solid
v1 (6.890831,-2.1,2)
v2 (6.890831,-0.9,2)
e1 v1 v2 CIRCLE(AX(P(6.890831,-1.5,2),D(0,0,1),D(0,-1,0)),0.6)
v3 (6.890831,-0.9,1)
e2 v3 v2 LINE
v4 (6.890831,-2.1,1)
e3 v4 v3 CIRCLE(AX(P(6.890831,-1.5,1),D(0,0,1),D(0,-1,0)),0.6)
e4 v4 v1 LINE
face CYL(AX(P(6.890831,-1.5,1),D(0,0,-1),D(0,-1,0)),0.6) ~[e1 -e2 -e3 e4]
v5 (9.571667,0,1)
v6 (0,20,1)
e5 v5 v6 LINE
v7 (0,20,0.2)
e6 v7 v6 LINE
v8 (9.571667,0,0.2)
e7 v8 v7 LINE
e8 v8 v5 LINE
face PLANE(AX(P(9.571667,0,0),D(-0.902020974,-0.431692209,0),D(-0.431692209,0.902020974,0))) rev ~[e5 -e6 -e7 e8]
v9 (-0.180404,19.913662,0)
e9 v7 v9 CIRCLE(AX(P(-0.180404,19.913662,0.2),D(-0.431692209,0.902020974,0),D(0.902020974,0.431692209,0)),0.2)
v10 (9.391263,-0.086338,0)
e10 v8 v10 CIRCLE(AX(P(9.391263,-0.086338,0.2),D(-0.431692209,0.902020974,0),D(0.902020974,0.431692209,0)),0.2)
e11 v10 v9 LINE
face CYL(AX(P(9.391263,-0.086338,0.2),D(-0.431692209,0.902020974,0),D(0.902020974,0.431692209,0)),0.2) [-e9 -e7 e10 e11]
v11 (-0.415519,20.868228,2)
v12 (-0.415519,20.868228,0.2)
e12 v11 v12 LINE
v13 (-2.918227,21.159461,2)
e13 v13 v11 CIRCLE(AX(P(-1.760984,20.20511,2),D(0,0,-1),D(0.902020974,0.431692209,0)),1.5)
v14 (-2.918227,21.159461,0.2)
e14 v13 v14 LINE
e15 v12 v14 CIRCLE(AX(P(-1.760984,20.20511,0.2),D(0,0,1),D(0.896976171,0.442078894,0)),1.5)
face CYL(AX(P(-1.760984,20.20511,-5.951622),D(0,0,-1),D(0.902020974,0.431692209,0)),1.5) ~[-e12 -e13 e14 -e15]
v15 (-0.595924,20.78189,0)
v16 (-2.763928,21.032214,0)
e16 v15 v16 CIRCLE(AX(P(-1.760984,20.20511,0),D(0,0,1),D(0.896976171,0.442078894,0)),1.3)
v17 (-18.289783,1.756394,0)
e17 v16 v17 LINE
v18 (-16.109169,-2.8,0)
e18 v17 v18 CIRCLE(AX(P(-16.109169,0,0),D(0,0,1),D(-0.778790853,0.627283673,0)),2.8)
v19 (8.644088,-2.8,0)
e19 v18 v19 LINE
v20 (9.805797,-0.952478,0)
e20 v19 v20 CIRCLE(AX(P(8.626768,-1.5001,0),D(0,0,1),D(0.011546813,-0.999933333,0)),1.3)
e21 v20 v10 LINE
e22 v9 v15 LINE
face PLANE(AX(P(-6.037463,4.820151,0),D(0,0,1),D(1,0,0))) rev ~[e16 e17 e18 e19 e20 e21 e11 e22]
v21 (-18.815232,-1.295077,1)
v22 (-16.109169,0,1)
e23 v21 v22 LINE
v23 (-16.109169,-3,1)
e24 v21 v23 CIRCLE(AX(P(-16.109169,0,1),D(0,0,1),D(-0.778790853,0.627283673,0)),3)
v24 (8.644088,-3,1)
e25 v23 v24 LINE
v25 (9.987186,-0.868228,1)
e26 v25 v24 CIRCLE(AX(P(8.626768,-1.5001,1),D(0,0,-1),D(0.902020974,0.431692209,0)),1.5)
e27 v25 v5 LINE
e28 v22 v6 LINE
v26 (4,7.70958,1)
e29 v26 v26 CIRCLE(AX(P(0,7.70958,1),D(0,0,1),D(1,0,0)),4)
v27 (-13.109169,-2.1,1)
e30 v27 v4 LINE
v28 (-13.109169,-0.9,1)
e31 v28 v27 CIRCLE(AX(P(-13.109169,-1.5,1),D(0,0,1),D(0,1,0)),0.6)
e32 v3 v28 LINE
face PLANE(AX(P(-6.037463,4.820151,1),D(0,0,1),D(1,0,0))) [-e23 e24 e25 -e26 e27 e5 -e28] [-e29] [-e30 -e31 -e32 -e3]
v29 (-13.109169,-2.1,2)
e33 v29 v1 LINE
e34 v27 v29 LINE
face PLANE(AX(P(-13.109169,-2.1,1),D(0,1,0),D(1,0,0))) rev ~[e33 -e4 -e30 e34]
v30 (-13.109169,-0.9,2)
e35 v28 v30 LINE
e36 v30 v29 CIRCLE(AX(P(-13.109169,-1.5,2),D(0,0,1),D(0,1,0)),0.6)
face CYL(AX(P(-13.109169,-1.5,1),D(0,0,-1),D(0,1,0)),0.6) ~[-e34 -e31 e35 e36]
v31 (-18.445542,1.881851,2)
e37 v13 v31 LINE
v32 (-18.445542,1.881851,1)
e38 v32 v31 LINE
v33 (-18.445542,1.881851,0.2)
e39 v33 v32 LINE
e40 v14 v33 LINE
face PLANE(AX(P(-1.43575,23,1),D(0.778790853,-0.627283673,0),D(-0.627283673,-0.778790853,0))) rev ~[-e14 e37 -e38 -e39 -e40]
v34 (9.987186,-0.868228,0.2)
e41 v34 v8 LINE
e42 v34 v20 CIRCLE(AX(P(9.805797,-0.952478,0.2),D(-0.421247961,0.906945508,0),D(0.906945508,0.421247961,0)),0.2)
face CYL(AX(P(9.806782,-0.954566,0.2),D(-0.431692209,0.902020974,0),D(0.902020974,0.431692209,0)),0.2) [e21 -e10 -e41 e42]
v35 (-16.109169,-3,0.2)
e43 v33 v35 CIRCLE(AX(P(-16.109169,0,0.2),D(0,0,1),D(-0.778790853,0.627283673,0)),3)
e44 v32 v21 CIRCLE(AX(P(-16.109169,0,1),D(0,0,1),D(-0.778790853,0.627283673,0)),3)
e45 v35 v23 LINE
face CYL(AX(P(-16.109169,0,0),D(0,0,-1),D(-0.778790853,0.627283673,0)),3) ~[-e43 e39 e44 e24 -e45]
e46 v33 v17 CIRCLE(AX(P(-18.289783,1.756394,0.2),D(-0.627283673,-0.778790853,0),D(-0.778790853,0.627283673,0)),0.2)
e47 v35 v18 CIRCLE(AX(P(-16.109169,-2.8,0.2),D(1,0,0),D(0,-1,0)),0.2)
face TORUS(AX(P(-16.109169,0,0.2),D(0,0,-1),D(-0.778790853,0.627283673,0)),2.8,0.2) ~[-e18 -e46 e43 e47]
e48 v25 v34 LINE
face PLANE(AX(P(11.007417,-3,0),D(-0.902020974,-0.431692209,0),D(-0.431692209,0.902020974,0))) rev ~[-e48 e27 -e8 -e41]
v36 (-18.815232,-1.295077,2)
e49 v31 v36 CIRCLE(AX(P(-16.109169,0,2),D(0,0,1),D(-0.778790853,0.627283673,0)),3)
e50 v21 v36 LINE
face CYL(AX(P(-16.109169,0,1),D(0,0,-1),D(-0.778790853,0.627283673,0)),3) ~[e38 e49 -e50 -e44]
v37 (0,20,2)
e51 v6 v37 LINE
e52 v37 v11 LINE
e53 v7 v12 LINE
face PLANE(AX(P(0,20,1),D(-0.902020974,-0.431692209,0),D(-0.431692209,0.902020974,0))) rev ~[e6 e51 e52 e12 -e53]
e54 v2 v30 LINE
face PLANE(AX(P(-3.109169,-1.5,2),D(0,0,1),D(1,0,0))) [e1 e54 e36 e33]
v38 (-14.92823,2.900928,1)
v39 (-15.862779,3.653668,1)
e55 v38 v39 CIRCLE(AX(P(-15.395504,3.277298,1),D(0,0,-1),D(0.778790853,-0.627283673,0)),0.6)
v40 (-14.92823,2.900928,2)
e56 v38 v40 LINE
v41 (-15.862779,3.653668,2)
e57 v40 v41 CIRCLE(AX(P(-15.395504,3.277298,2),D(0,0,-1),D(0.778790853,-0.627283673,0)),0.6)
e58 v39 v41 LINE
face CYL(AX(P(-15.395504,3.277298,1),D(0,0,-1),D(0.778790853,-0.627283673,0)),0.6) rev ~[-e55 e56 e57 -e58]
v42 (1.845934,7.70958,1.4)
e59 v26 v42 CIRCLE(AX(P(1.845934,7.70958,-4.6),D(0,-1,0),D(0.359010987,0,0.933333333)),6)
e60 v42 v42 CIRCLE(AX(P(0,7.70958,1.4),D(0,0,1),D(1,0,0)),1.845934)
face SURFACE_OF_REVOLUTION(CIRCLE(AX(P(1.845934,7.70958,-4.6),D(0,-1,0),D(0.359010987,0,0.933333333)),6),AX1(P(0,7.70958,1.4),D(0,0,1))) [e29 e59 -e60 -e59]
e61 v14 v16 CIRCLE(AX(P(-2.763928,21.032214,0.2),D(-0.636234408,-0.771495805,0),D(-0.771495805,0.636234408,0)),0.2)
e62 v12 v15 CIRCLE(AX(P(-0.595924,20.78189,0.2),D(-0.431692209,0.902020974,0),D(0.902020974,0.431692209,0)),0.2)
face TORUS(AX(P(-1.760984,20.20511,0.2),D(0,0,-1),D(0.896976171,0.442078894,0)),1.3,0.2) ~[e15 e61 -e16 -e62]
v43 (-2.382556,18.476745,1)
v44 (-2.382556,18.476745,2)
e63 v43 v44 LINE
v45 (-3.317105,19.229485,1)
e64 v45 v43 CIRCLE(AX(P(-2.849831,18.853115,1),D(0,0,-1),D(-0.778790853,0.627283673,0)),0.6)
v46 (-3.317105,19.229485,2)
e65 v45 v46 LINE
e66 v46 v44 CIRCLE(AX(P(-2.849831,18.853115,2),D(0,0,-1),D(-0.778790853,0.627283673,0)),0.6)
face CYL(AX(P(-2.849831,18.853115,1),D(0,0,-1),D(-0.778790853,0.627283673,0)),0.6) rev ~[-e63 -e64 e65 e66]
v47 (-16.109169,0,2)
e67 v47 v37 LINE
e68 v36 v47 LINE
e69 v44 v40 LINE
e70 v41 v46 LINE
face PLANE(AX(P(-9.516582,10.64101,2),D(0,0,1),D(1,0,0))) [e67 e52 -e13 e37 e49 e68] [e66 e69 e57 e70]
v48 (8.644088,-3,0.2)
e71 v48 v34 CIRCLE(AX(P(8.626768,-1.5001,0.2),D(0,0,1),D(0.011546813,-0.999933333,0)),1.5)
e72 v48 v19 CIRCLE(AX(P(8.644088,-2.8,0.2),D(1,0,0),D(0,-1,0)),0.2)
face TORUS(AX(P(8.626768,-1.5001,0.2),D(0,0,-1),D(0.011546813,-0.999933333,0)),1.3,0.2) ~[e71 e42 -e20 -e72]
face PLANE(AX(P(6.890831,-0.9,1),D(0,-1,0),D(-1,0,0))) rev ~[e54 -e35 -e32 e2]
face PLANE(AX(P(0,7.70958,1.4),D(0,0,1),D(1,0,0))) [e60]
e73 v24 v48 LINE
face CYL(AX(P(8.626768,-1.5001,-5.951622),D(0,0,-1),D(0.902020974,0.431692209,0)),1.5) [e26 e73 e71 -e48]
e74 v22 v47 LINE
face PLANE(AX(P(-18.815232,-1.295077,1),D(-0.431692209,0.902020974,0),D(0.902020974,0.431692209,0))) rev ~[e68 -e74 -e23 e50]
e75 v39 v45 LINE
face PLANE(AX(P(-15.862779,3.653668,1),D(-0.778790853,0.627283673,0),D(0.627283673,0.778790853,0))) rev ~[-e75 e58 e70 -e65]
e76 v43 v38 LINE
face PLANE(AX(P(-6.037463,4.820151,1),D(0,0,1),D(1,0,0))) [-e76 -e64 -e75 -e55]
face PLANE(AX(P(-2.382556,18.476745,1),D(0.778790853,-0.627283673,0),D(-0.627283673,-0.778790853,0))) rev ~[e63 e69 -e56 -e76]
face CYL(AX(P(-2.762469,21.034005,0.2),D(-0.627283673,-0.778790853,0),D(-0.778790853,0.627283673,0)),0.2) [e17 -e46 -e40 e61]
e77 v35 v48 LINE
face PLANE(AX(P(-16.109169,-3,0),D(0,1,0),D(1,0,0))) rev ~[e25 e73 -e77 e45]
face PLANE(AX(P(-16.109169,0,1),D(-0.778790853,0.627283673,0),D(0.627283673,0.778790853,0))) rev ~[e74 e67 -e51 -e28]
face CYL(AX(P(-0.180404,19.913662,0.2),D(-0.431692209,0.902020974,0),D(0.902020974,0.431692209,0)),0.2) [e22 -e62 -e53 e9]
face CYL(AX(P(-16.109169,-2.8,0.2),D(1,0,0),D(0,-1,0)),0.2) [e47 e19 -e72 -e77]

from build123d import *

# Parameters (mm, degrees)
F2_DEPTH    = 1
F4_DEPTH    = 1
F5_T1_DEPTH = 13.9032439889
F5_T3_DEPTH = 12.9032439889
F6_R        = 4
F7_DEPTH    = 0.4
F10_R       = 0.2


# Not quite as in the source:
# - a fillet or chamfer that OpenCascade refuses, or shapes differently, is made with other operations: its cross-section is extruded or revolved along the edge and cut away or added


with BuildPart() as f2:
    # F0 (on Top) → F2 (new body)
    with BuildSketch(Plane.XY):
        Polygon((0, 20), (-16.1091689951, 0), (9.5716667723, 0), align=None)
    extrude(amount=F2_DEPTH)



with BuildPart() as f2b:
    # F1 (on face) → F2, piece 2 (new body)
    with BuildSketch(Plane.XY):
        with BuildLine():
            Line((-1.4357500158, 23), (-18.4455415549, 1.8818510201))
            ThreePointArc((-18.4455415549, 1.8818510201), (-18.8152319157, -1.295076627), (-16.1091689951, -3))
            Line((-16.1091689951, -3), (11.0074167882, -3))
            Line((11.0074167882, -3), (9.5716667723, 0))
            Line((9.5716667723, 0), (-16.1091689951, 0))
            Line((-16.1091689951, 0), (0, 20))
            Line((0, 20), (-1.4357500158, 23))
        make_face()
    extrude(amount=F2_DEPTH)


with BuildPart() as f2_1:
    add(f2.part)

    add(f2b.part)  # F4 merges F2b
    # F3 (on face) → F4 (join)
    with BuildSketch(Plane.XY.offset(1)):
        with BuildLine():
            Line((-18.8152319157, -1.295076627), (-16.1091689951, 0))
            Line((-16.1091689951, 0), (0, 20))
            Line((0, 20), (-1.4357500158, 23))
            Line((-1.4357500158, 23), (-18.4455415549, 1.8818510201))
            ThreePointArc((-18.4455415549, 1.8818510201), (-19.0890609751, 0.3467618604), (-18.8152319157, -1.295076627))
        make_face()
        with BuildLine():
            ThreePointArc((-14.928229743, 2.9009278658), (-15.771874459, 2.8100235579), (-15.8627787669, 3.6536682739))
            Line((-15.8627787669, 3.6536682739), (-3.3171052997, 19.2294853393))
            ThreePointArc((-3.3171052997, 19.2294853393), (-2.4734605837, 19.3203896472), (-2.3825562758, 18.4767449312))
            Line((-2.3825562758, 18.4767449312), (-14.928229743, 2.9009278658))
        make_face(mode=Mode.SUBTRACT)
        with BuildLine():
            Line((6.8908310049, -0.9), (-13.1091689951, -0.9))
            ThreePointArc((-13.1091689951, -0.9), (-13.7091689951, -1.5), (-13.1091689951, -2.1))
            Line((-13.1091689951, -2.1), (6.8908310049, -2.1))
            ThreePointArc((6.8908310049, -2.1), (7.4908310049, -1.5), (6.8908310049, -0.9))
        make_face()
    extrude(amount=F4_DEPTH)

    # F5: fillet of radius 1.5 on 2 edges, made by hand

    # F5_s2 → F5_t1 (cut)
    with BuildSketch(Plane.XY.offset(-5.9516219944)):
        with BuildLine():
            ThreePointArc((-0.4079522763, 20.8526480249), (-1.5876028064, 21.6950557014), (-2.9291700165, 21.1460352214))
            Line((-2.9291700165, 21.1460352214), (-2.9525337421, 21.1648537316))
            ThreePointArc((-2.9525337421, 21.1648537316), (-2.2057848022, 22.0918047567), (-1.4591137414, 23.0188185102))
            Line((-1.4591137414, 23.0188185102), (-1.4086893866, 23.0129507663))
            ThreePointArc((-1.4086893866, 23.0129507663), (-0.8948356179, 21.9392531941), (-0.3808916471, 20.8655987912))
            Line((-0.3808916471, 20.8655987912), (-0.4079522763, 20.8526480249))
        make_face()
    extrude(amount=F5_T1_DEPTH, mode=Mode.SUBTRACT)

    # F5_s4 → F5_t3 (cut)
    with BuildSketch(Plane.XY.offset(-5.9516219944)):
        with BuildLine():
            ThreePointArc((9.9797994528, -0.8525616865), (9.8958833281, -2.2996913111), (8.6267679925, -3.0001))
            Line((8.6267679925, -3.0001), (8.6267679925, -3.0301))
            ThreePointArc((8.6267679925, -3.0301), (9.8170923903, -3.03), (11.0074167882, -3.03))
            Line((11.0074167882, -3.03), (11.0344774174, -2.9870492337))
            ThreePointArc((11.0344774174, -2.9870492337), (10.5206236486, -1.9133516616), (10.006860082, -0.8396109202))
            Line((10.006860082, -0.8396109202), (9.9797994528, -0.8525616865))
        make_face()
    extrude(amount=F5_T3_DEPTH, mode=Mode.SUBTRACT)

    # F6 (on face) → F7 (join)
    with BuildSketch(Plane.XY.offset(1)):
        with Locations((0, 7.70957988)):
            Circle(F6_R)
    extrude(amount=F7_DEPTH)

    # F8: fillet of radius 6 on 1 edges, made by hand

    # F8_s1 → F8_t2 (revolve, cut)
    with BuildSketch(Plane.XZ.offset(-7.70957988)):
        with BuildLine():
            ThreePointArc((4, 1), (2.9413791922, 1.2991524815), (1.8459340771, 1.4))
            Line((1.8459340771, 1.4), (4, 1.4))
            Line((4, 1.4), (4, 1))
        make_face()
    revolve(axis=Axis((0, 7.70957988, 1.4), (0, 0, 1)), mode=Mode.SUBTRACT)

    # F9: union 

    # F10
    f10_edges = [f2_1.edges().sort_by_distance(p)[0] for p in [
        (4.785833, 10, 0),
        (-1.587603, 21.695056, 0),
        (-10.681885, 11.520656, 0),
        (-18.815232, -1.295077, 0),
        (-3.73254, -3, 0),
        (9.895883, -2.299691, 0),
    ]]
    fillet(f10_edges, radius=F10_R)


solid = f2_1.part
